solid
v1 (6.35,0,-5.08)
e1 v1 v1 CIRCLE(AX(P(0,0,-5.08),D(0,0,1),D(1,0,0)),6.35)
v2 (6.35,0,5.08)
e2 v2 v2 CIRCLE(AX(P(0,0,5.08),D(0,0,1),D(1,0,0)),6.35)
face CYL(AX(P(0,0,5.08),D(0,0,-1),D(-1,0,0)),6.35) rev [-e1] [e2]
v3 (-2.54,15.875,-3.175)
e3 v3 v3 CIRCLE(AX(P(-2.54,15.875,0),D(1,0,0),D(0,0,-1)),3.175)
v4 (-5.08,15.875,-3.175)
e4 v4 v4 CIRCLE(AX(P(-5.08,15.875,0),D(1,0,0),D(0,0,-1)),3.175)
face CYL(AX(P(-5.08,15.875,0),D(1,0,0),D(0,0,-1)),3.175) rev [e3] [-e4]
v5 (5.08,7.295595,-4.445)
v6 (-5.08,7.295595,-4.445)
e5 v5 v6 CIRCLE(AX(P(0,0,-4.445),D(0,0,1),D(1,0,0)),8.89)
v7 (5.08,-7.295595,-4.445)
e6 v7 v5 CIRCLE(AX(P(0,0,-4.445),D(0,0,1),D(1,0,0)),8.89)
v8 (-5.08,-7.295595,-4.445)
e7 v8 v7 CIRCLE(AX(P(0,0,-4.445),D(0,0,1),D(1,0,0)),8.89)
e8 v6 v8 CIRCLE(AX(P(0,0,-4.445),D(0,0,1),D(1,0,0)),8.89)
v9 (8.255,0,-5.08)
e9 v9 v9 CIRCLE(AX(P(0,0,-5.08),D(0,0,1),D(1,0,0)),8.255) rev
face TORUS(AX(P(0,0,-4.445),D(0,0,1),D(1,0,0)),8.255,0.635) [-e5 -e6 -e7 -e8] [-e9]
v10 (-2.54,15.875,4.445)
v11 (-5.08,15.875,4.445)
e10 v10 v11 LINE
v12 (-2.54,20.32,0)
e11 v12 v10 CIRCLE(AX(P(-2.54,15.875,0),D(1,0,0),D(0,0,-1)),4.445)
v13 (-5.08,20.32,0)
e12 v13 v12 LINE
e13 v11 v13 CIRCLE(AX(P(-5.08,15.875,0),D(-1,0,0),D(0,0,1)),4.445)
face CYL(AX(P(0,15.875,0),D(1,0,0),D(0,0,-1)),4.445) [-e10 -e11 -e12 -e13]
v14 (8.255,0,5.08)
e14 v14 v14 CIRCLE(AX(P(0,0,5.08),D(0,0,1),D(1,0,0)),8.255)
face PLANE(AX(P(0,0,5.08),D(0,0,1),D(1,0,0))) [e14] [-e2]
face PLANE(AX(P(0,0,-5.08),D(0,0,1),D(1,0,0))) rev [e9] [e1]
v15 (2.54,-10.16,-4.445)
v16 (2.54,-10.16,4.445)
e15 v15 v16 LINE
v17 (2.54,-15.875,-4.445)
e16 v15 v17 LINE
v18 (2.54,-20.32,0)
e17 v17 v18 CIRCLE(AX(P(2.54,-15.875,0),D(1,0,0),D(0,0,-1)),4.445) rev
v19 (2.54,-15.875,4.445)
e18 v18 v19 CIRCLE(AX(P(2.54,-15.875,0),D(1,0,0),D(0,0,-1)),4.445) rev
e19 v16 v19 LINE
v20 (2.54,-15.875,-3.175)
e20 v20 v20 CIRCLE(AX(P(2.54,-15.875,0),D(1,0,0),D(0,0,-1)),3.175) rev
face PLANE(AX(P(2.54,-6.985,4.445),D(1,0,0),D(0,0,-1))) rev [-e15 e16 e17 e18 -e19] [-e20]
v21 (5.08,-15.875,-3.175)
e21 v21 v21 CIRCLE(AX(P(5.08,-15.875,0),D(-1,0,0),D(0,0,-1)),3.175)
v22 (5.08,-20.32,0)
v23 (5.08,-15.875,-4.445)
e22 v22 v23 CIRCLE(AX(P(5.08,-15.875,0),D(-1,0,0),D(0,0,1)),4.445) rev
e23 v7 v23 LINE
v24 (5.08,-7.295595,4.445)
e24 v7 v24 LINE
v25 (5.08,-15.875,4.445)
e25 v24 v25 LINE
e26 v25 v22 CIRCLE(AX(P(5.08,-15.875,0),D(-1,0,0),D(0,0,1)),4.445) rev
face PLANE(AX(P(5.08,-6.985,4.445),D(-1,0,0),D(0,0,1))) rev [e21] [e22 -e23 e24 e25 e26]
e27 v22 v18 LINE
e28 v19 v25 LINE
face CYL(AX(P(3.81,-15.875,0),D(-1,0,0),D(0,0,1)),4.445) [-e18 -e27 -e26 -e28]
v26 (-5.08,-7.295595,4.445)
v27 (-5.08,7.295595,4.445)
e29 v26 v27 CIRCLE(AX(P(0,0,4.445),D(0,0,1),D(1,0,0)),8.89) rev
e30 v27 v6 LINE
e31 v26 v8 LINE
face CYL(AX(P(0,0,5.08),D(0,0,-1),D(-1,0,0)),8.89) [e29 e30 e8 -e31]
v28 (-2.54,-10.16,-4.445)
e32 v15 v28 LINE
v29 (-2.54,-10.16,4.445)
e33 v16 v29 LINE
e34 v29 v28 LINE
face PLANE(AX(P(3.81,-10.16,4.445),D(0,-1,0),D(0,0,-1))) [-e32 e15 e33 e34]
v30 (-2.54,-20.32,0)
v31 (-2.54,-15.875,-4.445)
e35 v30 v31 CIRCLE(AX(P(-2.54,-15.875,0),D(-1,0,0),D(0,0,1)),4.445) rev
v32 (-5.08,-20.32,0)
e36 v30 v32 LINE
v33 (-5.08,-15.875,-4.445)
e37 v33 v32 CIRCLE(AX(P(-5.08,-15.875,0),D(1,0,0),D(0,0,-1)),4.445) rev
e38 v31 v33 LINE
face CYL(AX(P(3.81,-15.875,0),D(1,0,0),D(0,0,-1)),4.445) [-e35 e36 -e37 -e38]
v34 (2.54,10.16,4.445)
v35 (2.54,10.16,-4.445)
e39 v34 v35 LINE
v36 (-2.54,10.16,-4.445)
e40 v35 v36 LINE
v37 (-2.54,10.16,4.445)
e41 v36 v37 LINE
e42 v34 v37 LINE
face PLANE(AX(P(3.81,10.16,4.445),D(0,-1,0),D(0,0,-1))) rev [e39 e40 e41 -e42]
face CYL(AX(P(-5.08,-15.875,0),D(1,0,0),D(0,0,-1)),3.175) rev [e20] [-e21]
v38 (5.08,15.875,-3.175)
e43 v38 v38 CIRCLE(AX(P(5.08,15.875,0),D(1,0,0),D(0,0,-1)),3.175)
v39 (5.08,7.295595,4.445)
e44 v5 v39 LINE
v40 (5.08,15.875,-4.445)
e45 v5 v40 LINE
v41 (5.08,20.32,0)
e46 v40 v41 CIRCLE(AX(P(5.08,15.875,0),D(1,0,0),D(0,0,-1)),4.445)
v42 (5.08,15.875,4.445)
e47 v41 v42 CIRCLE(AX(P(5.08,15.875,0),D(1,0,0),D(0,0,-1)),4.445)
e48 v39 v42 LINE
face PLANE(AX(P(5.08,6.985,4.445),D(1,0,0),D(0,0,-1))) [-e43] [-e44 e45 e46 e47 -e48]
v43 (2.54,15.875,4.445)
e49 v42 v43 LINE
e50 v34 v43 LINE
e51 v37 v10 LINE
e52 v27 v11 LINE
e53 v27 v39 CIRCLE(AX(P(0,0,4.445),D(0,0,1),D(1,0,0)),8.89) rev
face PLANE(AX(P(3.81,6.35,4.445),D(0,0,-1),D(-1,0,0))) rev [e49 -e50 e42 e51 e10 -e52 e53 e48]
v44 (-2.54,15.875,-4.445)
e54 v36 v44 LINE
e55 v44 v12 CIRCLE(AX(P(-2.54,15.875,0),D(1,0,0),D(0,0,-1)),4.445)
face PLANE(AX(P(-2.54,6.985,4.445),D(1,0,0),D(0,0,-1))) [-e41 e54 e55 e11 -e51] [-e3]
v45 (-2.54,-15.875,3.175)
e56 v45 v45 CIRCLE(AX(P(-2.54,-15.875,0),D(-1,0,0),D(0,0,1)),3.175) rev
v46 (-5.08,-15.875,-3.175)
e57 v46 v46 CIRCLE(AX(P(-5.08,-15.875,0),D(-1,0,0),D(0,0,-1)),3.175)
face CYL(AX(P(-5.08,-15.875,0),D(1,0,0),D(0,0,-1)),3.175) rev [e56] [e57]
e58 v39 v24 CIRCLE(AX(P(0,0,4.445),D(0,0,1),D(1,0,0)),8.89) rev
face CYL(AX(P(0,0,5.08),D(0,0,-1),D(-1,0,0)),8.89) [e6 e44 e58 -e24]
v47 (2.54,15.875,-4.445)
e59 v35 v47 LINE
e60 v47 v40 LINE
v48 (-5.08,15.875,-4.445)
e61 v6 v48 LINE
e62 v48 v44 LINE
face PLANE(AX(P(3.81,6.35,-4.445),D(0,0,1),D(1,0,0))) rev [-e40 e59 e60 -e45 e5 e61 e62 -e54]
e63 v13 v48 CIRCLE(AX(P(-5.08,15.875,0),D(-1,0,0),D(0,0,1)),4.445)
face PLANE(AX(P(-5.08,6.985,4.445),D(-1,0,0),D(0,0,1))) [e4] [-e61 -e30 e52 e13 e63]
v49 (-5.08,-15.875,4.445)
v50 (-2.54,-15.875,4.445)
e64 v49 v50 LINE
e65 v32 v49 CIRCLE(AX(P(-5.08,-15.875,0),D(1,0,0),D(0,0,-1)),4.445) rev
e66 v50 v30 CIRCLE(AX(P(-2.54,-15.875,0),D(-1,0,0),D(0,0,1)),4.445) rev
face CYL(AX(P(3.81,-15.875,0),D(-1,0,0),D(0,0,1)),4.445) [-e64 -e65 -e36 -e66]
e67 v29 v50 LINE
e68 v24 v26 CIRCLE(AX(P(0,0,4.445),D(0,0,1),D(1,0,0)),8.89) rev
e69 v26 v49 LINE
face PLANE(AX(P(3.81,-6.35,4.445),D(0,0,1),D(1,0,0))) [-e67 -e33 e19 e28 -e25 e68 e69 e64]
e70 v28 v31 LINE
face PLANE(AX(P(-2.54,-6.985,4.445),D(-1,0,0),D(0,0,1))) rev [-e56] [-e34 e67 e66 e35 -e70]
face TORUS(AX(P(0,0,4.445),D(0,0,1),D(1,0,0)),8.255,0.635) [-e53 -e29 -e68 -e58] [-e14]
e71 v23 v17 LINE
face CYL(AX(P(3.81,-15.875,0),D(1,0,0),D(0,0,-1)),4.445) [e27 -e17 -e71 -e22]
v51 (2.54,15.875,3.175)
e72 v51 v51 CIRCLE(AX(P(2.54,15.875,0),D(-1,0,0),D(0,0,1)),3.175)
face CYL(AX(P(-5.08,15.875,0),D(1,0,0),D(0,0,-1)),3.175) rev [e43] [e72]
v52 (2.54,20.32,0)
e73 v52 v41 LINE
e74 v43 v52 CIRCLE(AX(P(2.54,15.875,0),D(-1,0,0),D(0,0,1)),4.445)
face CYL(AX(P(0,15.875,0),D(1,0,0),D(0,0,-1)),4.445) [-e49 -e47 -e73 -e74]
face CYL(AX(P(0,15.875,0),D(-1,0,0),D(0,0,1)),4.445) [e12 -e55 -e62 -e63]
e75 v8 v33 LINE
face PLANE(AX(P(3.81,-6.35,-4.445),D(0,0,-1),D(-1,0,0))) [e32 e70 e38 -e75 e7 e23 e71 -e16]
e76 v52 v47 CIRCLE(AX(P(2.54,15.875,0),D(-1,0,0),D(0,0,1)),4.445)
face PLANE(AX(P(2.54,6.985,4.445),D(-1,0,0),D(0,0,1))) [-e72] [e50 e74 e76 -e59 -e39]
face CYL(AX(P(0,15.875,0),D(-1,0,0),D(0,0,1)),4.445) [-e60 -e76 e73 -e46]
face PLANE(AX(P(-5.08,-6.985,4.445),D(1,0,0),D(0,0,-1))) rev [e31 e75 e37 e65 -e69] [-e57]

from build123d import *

# Parameters (mm, degrees)
SKETCH1_R            = 8.89
SKETCH1_R_2          = 6.35
BOSS_EXTRUDE1_DEPTH  = 5.08
FILLET1_R            = 0.635
SKETCH2_W            = 8.89
SKETCH2_H            = 3.81
BOSS_EXTRUDE2_DEPTH  = 3.81
BOSS_EXTRUDE3_START  = -3.175
SKETCH3_W            = 2.54
SKETCH3_H            = 8.89
BOSS_EXTRUDE3_DEPTH  = 13.335
FILLET2_R            = 4.445
SKETCH4_R            = 3.175
CUT_EXTRUDE1_DEPTH   = 10.16
FILLET2_OF_MIRROR1_R = 4.445


with BuildPart() as part:
    # Sketch1 → Boss-Extrude1 (new, symmetric)
    with BuildSketch(Plane.XY):
        Circle(SKETCH1_R)
        Circle(SKETCH1_R_2, mode=Mode.SUBTRACT)
    extrude(amount=BOSS_EXTRUDE1_DEPTH, both=True)

    # Fillet1
    fillet1_edges = [part.edges().sort_by_distance(p)[0] for p in [
        (-8.89, 0, -5.08),
        (-8.89, 0, 5.08),
    ]]
    fillet(fillet1_edges, radius=FILLET1_R)

    # Sketch2 → Boss-Extrude2 (add, symmetric)
    with BuildSketch(Plane(origin=(0, 0, 0), x_dir=(0, 0, -1), z_dir=(1, 0, 0))):
        with Locations((0, 8.255)):
            Rectangle(SKETCH2_W, SKETCH2_H)
    boss_extrude2 = extrude(amount=BOSS_EXTRUDE2_DEPTH, both=True)

    # Sketch3 → Boss-Extrude3 (add)
    with BuildSketch(Plane(origin=(0, 10.16, 0), x_dir=(1, 0, 0), z_dir=(0, 1, 0)).offset(BOSS_EXTRUDE3_START)):
        with Locations((3.81, 0)):
            Rectangle(SKETCH3_W, SKETCH3_H)
        with Locations((-3.81, 0)):
            Rectangle(SKETCH3_W, SKETCH3_H)
    boss_extrude3 = extrude(amount=BOSS_EXTRUDE3_DEPTH)

    # Fillet2
    fillet2_edges = [part.edges().sort_by_distance(p)[0] for p in [
        (-3.81, 20.32, -4.445),
        (-3.81, 20.32, 4.445),
        (3.81, 20.32, -4.445),
        (3.81, 20.32, 4.445),
    ]]
    fillet(fillet2_edges, radius=FILLET2_R - 0.0001)  # a hair under: the kernel refuses the full size

    # Sketch4 → Cut-Extrude1 (cut)
    with BuildSketch(Plane(origin=(5.08, 0, 0), x_dir=(0, 0, -1), z_dir=(1, 0, 0))):
        with Locations((0, 15.875)):
            Circle(SKETCH4_R)
    cut_extrude1 = extrude(amount=-CUT_EXTRUDE1_DEPTH, mode=Mode.SUBTRACT)

    # Mirror1: Boss-Extrude2, Boss-Extrude3, Cut-Extrude1 across plane
    add(boss_extrude2.mirror(Plane.ZX))
    add(boss_extrude3.mirror(Plane.ZX))
    add(cut_extrude1.mirror(Plane.ZX), mode=Mode.SUBTRACT)

    # Fillet2 of Mirror1
    fillet2_of_mirror1_edges = [part.edges().sort_by_distance(p)[0] for p in [
        (-3.81, -20.32, -4.445),
        (-3.81, -20.32, 4.445),
        (3.81, -20.32, -4.445),
        (3.81, -20.32, 4.445),
    ]]
    fillet(fillet2_of_mirror1_edges, radius=FILLET2_OF_MIRROR1_R - 0.0001)  # a hair under: the kernel refuses the full size


solid = part.part
